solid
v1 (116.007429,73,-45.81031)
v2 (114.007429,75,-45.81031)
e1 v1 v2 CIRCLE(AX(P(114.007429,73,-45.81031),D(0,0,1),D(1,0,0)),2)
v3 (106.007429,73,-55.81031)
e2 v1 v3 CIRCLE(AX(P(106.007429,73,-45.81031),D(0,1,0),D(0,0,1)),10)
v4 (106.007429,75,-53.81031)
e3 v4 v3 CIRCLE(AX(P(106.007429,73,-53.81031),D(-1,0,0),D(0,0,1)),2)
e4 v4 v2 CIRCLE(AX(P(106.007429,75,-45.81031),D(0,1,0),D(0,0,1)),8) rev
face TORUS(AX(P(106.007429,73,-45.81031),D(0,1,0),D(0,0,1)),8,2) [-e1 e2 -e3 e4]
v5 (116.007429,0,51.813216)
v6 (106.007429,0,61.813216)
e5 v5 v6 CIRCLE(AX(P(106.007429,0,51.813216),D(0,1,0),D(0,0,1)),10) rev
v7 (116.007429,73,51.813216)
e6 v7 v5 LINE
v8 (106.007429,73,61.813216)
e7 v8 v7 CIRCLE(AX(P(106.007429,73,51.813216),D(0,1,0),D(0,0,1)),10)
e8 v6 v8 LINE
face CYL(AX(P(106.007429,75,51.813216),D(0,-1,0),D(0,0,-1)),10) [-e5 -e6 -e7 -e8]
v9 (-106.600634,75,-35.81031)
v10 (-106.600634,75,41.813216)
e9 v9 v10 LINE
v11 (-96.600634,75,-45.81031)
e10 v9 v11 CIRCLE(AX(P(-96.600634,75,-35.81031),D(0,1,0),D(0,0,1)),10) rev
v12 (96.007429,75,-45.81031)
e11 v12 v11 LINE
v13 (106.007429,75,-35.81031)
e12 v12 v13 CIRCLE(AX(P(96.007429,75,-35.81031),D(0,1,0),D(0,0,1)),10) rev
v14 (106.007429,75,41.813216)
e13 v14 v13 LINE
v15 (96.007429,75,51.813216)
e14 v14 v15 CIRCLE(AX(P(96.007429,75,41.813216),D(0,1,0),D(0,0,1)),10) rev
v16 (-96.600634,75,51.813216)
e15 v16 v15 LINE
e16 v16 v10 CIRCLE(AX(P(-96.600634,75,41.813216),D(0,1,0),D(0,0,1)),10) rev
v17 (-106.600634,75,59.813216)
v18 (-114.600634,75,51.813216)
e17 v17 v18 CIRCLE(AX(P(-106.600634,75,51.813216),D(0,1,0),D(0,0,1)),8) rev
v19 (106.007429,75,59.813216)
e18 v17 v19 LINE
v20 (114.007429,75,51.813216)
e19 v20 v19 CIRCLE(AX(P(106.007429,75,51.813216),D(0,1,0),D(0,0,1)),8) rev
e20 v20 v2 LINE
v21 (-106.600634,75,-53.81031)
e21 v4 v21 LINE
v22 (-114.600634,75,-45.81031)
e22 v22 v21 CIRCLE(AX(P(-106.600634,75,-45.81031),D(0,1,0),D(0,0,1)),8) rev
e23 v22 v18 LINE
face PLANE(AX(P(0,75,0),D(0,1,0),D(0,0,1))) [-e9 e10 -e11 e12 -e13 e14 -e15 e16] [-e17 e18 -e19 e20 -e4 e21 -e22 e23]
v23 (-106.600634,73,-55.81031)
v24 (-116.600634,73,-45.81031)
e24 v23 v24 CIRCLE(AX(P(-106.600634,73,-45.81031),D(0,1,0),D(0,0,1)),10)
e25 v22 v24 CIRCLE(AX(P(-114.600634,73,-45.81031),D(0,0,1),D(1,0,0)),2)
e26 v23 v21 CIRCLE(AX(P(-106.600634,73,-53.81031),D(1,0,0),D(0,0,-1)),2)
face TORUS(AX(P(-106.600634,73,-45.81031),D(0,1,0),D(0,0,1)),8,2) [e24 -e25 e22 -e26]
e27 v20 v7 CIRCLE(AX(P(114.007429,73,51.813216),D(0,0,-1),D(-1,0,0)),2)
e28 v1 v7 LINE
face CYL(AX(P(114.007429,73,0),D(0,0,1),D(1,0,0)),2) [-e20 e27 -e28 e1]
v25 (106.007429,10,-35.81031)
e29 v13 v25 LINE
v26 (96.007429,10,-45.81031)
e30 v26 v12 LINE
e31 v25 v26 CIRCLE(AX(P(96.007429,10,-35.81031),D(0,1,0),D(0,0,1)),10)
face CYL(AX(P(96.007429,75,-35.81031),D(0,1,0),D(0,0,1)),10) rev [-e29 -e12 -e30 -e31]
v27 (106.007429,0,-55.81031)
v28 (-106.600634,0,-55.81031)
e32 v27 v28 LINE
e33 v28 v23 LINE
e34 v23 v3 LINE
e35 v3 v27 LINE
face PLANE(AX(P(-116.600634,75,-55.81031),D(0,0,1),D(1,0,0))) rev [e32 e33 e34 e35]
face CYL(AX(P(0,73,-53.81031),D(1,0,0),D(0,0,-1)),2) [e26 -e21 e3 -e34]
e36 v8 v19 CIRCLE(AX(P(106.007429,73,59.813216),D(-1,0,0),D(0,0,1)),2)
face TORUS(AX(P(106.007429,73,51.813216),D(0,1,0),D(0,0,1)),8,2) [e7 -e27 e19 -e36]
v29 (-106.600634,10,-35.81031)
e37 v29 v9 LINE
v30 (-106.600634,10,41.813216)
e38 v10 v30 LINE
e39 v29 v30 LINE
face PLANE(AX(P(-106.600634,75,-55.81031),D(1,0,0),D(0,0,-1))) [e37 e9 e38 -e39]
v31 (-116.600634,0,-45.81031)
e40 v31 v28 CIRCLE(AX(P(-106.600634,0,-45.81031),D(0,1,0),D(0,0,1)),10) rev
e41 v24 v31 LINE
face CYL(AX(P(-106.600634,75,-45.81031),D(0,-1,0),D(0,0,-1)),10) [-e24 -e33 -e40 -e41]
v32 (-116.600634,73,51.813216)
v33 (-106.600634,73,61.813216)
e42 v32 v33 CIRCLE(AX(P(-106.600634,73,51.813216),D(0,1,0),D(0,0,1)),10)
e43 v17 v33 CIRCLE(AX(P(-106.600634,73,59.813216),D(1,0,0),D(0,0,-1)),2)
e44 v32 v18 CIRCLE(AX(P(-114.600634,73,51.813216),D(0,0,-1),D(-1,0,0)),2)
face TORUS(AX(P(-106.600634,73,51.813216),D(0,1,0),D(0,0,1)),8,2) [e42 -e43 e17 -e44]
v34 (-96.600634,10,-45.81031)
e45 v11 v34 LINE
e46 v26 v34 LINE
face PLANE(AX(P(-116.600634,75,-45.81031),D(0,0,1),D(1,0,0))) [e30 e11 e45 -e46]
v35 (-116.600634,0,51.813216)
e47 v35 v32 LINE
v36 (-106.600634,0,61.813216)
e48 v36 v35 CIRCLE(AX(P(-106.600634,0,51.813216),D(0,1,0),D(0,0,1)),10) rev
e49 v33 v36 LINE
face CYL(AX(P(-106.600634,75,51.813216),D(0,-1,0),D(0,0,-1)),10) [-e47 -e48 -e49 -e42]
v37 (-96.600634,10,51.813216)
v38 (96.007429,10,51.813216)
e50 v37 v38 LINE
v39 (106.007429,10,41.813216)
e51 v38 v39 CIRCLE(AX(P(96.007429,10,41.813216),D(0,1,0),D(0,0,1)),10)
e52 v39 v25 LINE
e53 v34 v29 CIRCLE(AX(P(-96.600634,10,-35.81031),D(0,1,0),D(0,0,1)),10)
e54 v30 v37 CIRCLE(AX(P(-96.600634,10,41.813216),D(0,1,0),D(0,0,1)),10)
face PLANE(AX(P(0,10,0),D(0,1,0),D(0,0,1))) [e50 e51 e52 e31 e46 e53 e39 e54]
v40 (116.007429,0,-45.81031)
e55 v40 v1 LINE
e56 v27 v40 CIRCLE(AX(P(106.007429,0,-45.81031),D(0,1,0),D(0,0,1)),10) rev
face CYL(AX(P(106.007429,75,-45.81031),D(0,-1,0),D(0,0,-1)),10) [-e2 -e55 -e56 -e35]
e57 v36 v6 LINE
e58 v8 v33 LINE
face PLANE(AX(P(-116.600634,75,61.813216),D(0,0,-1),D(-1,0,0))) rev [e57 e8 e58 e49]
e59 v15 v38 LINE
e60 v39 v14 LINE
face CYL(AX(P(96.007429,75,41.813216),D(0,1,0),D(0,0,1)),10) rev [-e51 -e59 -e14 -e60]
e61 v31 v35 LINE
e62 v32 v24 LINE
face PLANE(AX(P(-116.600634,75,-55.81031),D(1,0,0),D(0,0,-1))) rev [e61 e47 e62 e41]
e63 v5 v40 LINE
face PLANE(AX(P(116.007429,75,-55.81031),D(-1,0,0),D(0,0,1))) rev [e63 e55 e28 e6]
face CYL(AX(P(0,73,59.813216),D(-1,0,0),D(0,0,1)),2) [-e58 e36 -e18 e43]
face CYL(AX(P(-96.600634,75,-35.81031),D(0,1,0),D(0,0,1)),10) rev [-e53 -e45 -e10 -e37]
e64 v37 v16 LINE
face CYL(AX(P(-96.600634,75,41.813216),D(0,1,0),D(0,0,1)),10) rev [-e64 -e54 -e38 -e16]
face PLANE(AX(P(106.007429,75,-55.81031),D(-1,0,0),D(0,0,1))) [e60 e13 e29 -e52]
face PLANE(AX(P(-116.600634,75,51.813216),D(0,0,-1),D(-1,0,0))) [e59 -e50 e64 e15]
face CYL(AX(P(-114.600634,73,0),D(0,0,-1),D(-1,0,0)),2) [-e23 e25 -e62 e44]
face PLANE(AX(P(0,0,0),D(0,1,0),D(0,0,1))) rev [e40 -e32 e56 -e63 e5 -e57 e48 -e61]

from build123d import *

# Parameters (mm, degrees)
BOSS_EXTRUDE1_DEPTH = 75
SHELL13_T           = -10
FILLET5_R           = 10
FILLET8_R           = 2
FILLET9_R           = 10


with BuildPart() as part:
    # Sketch1 → Boss-Extrude1 (new body)
    with BuildSketch(Plane(origin=(0, 0, 0), x_dir=(1, 0, 0), z_dir=(0, 1, 0))):
        Polygon((-116.60063424078889, 55.81031027640047), (116.00742939980823, 55.81031027640047), (116.00742939980825, -61.81321623229694), (-116.60063424078888, -61.81321623229694), align=None)
    extrude(amount=BOSS_EXTRUDE1_DEPTH)

    # Shell13
    shell13_openings = [part.faces().sort_by_distance(p)[0] for p in [
        (-0.29660242, 75, 3.001452978),
    ]]
    offset(amount=SHELL13_T, openings=shell13_openings, kind=Kind.INTERSECTION)

    # Fillet5
    fillet5_edges = [part.edges().sort_by_distance(p)[0] for p in [
        (-106.60063424078889, 42.5, -45.81031027640047),
        (-106.60063424078889, 42.5, 51.81321623229694),
        (106.00742939980825, 42.5, 51.81321623229694),
        (106.00742939980823, 42.5, -45.81031027640047),
    ]]
    fillet(fillet5_edges, radius=FILLET5_R)

    # Fillet8
    fillet8_edges = [part.edges().sort_by_distance(p)[0] for p in [
        (116.00742939980825, 75, 3.001452977948233),
        (-0.2966024204903306, 75, -55.81031027640047),
        (-116.60063424078888, 75, 3.001452977948233),
        (-0.2966024204903164, 75, 61.81321623229694),
    ]]
    fillet(fillet8_edges, radius=FILLET8_R)

    # Fillet9
    # the kernel refuses this fillet: 10 mm, written as the material it takes off along each edge
    with BuildSketch(Plane(origin=(106.00742939980825, 75, 51.81321623229694), x_dir=(0, 0, 1), z_dir=(-1, 0, 0))) as fillet9_piece_1:
        with BuildLine():
            CenterArc((8, -2), 2, 0, 90)
            Line((10, -2), (10, 0))
            Line((10, 0), (8, 0))
        make_face()
    revolve(axis=Axis((106.00742939980825, 75, 51.81321623229694), (0, 1, 0)), revolution_arc=90.00000000000001, mode=Mode.SUBTRACT)
    with BuildSketch(Plane(origin=(-106.60063424078888, 75, 51.81321623229694), x_dir=(-1, 0, 1.2e-16), z_dir=(-1.2e-16, 0, -1))) as fillet9_piece_2:
        with BuildLine():
            CenterArc((8, -2), 2, 0, 90)
            Line((10, -2), (10, 0))
            Line((10, 0), (8, 0))
        make_face()
    revolve(axis=Axis((-106.60063424078888, 75, 51.81321623229694), (0, 1, 0)), revolution_arc=90, mode=Mode.SUBTRACT)
    with BuildSketch(Plane(origin=(106.00742939980823, 75, -45.81031027640047), x_dir=(1, 0, -1.2e-16), z_dir=(1.2e-16, 0, 1))) as fillet9_piece_3:
        with BuildLine():
            CenterArc((8, -2), 2, 0, 90)
            Line((10, -2), (10, 0))
            Line((10, 0), (8, 0))
        make_face()
    revolve(axis=Axis((106.00742939980823, 75, -45.81031027640047), (0, 1, 0)), revolution_arc=90, mode=Mode.SUBTRACT)
    with BuildSketch(Plane(origin=(-106.60063424078889, 75, -45.81031027640047), x_dir=(0, 0, -1), z_dir=(1, 0, 0))) as fillet9_piece_4:
        with BuildLine():
            CenterArc((8, -2), 2, 0, 90)
            Line((10, -2), (10, 0))
            Line((10, 0), (8, 0))
        make_face()
    revolve(axis=Axis((-106.60063424078889, 75, -45.81031027640047), (0, 1, 0)), revolution_arc=90.00000000000001, mode=Mode.SUBTRACT)
    with BuildSketch(Plane(origin=(-116.60063424078889, -25, -55.81031027640047), x_dir=(1, 0, 0), z_dir=(0, 1, 0)), Plane(origin=(116.00742939980823, -25, -55.81031027640047), x_dir=(0, 0, 1), z_dir=(0, 1, 0))) as fillet9_piece_5:
        with BuildLine():
            CenterArc((FILLET9_R, -FILLET9_R), FILLET9_R, 90, 90)
            Line((0, -FILLET9_R), (0, 0))
            Line((0, 0), (FILLET9_R, 0))
        make_face()
    extrude(amount=100.00000000000001, mode=Mode.SUBTRACT)
    with BuildSketch(Plane(origin=(-116.60063424078888, -25, 61.81321623229694), x_dir=(1, 0, 0), z_dir=(0, 1, 0)), Plane(origin=(116.00742939980825, -25, 61.81321623229694), x_dir=(0, 0, -1), z_dir=(0, 1, 0))) as fillet9_piece_6:
        with BuildLine():
            CenterArc((FILLET9_R, FILLET9_R), FILLET9_R, 180, 90)
            Line((0, FILLET9_R), (0, 0))
            Line((0, 0), (FILLET9_R, 0))
        make_face()
    extrude(amount=100.00000000000001, mode=Mode.SUBTRACT)


solid = part.part
